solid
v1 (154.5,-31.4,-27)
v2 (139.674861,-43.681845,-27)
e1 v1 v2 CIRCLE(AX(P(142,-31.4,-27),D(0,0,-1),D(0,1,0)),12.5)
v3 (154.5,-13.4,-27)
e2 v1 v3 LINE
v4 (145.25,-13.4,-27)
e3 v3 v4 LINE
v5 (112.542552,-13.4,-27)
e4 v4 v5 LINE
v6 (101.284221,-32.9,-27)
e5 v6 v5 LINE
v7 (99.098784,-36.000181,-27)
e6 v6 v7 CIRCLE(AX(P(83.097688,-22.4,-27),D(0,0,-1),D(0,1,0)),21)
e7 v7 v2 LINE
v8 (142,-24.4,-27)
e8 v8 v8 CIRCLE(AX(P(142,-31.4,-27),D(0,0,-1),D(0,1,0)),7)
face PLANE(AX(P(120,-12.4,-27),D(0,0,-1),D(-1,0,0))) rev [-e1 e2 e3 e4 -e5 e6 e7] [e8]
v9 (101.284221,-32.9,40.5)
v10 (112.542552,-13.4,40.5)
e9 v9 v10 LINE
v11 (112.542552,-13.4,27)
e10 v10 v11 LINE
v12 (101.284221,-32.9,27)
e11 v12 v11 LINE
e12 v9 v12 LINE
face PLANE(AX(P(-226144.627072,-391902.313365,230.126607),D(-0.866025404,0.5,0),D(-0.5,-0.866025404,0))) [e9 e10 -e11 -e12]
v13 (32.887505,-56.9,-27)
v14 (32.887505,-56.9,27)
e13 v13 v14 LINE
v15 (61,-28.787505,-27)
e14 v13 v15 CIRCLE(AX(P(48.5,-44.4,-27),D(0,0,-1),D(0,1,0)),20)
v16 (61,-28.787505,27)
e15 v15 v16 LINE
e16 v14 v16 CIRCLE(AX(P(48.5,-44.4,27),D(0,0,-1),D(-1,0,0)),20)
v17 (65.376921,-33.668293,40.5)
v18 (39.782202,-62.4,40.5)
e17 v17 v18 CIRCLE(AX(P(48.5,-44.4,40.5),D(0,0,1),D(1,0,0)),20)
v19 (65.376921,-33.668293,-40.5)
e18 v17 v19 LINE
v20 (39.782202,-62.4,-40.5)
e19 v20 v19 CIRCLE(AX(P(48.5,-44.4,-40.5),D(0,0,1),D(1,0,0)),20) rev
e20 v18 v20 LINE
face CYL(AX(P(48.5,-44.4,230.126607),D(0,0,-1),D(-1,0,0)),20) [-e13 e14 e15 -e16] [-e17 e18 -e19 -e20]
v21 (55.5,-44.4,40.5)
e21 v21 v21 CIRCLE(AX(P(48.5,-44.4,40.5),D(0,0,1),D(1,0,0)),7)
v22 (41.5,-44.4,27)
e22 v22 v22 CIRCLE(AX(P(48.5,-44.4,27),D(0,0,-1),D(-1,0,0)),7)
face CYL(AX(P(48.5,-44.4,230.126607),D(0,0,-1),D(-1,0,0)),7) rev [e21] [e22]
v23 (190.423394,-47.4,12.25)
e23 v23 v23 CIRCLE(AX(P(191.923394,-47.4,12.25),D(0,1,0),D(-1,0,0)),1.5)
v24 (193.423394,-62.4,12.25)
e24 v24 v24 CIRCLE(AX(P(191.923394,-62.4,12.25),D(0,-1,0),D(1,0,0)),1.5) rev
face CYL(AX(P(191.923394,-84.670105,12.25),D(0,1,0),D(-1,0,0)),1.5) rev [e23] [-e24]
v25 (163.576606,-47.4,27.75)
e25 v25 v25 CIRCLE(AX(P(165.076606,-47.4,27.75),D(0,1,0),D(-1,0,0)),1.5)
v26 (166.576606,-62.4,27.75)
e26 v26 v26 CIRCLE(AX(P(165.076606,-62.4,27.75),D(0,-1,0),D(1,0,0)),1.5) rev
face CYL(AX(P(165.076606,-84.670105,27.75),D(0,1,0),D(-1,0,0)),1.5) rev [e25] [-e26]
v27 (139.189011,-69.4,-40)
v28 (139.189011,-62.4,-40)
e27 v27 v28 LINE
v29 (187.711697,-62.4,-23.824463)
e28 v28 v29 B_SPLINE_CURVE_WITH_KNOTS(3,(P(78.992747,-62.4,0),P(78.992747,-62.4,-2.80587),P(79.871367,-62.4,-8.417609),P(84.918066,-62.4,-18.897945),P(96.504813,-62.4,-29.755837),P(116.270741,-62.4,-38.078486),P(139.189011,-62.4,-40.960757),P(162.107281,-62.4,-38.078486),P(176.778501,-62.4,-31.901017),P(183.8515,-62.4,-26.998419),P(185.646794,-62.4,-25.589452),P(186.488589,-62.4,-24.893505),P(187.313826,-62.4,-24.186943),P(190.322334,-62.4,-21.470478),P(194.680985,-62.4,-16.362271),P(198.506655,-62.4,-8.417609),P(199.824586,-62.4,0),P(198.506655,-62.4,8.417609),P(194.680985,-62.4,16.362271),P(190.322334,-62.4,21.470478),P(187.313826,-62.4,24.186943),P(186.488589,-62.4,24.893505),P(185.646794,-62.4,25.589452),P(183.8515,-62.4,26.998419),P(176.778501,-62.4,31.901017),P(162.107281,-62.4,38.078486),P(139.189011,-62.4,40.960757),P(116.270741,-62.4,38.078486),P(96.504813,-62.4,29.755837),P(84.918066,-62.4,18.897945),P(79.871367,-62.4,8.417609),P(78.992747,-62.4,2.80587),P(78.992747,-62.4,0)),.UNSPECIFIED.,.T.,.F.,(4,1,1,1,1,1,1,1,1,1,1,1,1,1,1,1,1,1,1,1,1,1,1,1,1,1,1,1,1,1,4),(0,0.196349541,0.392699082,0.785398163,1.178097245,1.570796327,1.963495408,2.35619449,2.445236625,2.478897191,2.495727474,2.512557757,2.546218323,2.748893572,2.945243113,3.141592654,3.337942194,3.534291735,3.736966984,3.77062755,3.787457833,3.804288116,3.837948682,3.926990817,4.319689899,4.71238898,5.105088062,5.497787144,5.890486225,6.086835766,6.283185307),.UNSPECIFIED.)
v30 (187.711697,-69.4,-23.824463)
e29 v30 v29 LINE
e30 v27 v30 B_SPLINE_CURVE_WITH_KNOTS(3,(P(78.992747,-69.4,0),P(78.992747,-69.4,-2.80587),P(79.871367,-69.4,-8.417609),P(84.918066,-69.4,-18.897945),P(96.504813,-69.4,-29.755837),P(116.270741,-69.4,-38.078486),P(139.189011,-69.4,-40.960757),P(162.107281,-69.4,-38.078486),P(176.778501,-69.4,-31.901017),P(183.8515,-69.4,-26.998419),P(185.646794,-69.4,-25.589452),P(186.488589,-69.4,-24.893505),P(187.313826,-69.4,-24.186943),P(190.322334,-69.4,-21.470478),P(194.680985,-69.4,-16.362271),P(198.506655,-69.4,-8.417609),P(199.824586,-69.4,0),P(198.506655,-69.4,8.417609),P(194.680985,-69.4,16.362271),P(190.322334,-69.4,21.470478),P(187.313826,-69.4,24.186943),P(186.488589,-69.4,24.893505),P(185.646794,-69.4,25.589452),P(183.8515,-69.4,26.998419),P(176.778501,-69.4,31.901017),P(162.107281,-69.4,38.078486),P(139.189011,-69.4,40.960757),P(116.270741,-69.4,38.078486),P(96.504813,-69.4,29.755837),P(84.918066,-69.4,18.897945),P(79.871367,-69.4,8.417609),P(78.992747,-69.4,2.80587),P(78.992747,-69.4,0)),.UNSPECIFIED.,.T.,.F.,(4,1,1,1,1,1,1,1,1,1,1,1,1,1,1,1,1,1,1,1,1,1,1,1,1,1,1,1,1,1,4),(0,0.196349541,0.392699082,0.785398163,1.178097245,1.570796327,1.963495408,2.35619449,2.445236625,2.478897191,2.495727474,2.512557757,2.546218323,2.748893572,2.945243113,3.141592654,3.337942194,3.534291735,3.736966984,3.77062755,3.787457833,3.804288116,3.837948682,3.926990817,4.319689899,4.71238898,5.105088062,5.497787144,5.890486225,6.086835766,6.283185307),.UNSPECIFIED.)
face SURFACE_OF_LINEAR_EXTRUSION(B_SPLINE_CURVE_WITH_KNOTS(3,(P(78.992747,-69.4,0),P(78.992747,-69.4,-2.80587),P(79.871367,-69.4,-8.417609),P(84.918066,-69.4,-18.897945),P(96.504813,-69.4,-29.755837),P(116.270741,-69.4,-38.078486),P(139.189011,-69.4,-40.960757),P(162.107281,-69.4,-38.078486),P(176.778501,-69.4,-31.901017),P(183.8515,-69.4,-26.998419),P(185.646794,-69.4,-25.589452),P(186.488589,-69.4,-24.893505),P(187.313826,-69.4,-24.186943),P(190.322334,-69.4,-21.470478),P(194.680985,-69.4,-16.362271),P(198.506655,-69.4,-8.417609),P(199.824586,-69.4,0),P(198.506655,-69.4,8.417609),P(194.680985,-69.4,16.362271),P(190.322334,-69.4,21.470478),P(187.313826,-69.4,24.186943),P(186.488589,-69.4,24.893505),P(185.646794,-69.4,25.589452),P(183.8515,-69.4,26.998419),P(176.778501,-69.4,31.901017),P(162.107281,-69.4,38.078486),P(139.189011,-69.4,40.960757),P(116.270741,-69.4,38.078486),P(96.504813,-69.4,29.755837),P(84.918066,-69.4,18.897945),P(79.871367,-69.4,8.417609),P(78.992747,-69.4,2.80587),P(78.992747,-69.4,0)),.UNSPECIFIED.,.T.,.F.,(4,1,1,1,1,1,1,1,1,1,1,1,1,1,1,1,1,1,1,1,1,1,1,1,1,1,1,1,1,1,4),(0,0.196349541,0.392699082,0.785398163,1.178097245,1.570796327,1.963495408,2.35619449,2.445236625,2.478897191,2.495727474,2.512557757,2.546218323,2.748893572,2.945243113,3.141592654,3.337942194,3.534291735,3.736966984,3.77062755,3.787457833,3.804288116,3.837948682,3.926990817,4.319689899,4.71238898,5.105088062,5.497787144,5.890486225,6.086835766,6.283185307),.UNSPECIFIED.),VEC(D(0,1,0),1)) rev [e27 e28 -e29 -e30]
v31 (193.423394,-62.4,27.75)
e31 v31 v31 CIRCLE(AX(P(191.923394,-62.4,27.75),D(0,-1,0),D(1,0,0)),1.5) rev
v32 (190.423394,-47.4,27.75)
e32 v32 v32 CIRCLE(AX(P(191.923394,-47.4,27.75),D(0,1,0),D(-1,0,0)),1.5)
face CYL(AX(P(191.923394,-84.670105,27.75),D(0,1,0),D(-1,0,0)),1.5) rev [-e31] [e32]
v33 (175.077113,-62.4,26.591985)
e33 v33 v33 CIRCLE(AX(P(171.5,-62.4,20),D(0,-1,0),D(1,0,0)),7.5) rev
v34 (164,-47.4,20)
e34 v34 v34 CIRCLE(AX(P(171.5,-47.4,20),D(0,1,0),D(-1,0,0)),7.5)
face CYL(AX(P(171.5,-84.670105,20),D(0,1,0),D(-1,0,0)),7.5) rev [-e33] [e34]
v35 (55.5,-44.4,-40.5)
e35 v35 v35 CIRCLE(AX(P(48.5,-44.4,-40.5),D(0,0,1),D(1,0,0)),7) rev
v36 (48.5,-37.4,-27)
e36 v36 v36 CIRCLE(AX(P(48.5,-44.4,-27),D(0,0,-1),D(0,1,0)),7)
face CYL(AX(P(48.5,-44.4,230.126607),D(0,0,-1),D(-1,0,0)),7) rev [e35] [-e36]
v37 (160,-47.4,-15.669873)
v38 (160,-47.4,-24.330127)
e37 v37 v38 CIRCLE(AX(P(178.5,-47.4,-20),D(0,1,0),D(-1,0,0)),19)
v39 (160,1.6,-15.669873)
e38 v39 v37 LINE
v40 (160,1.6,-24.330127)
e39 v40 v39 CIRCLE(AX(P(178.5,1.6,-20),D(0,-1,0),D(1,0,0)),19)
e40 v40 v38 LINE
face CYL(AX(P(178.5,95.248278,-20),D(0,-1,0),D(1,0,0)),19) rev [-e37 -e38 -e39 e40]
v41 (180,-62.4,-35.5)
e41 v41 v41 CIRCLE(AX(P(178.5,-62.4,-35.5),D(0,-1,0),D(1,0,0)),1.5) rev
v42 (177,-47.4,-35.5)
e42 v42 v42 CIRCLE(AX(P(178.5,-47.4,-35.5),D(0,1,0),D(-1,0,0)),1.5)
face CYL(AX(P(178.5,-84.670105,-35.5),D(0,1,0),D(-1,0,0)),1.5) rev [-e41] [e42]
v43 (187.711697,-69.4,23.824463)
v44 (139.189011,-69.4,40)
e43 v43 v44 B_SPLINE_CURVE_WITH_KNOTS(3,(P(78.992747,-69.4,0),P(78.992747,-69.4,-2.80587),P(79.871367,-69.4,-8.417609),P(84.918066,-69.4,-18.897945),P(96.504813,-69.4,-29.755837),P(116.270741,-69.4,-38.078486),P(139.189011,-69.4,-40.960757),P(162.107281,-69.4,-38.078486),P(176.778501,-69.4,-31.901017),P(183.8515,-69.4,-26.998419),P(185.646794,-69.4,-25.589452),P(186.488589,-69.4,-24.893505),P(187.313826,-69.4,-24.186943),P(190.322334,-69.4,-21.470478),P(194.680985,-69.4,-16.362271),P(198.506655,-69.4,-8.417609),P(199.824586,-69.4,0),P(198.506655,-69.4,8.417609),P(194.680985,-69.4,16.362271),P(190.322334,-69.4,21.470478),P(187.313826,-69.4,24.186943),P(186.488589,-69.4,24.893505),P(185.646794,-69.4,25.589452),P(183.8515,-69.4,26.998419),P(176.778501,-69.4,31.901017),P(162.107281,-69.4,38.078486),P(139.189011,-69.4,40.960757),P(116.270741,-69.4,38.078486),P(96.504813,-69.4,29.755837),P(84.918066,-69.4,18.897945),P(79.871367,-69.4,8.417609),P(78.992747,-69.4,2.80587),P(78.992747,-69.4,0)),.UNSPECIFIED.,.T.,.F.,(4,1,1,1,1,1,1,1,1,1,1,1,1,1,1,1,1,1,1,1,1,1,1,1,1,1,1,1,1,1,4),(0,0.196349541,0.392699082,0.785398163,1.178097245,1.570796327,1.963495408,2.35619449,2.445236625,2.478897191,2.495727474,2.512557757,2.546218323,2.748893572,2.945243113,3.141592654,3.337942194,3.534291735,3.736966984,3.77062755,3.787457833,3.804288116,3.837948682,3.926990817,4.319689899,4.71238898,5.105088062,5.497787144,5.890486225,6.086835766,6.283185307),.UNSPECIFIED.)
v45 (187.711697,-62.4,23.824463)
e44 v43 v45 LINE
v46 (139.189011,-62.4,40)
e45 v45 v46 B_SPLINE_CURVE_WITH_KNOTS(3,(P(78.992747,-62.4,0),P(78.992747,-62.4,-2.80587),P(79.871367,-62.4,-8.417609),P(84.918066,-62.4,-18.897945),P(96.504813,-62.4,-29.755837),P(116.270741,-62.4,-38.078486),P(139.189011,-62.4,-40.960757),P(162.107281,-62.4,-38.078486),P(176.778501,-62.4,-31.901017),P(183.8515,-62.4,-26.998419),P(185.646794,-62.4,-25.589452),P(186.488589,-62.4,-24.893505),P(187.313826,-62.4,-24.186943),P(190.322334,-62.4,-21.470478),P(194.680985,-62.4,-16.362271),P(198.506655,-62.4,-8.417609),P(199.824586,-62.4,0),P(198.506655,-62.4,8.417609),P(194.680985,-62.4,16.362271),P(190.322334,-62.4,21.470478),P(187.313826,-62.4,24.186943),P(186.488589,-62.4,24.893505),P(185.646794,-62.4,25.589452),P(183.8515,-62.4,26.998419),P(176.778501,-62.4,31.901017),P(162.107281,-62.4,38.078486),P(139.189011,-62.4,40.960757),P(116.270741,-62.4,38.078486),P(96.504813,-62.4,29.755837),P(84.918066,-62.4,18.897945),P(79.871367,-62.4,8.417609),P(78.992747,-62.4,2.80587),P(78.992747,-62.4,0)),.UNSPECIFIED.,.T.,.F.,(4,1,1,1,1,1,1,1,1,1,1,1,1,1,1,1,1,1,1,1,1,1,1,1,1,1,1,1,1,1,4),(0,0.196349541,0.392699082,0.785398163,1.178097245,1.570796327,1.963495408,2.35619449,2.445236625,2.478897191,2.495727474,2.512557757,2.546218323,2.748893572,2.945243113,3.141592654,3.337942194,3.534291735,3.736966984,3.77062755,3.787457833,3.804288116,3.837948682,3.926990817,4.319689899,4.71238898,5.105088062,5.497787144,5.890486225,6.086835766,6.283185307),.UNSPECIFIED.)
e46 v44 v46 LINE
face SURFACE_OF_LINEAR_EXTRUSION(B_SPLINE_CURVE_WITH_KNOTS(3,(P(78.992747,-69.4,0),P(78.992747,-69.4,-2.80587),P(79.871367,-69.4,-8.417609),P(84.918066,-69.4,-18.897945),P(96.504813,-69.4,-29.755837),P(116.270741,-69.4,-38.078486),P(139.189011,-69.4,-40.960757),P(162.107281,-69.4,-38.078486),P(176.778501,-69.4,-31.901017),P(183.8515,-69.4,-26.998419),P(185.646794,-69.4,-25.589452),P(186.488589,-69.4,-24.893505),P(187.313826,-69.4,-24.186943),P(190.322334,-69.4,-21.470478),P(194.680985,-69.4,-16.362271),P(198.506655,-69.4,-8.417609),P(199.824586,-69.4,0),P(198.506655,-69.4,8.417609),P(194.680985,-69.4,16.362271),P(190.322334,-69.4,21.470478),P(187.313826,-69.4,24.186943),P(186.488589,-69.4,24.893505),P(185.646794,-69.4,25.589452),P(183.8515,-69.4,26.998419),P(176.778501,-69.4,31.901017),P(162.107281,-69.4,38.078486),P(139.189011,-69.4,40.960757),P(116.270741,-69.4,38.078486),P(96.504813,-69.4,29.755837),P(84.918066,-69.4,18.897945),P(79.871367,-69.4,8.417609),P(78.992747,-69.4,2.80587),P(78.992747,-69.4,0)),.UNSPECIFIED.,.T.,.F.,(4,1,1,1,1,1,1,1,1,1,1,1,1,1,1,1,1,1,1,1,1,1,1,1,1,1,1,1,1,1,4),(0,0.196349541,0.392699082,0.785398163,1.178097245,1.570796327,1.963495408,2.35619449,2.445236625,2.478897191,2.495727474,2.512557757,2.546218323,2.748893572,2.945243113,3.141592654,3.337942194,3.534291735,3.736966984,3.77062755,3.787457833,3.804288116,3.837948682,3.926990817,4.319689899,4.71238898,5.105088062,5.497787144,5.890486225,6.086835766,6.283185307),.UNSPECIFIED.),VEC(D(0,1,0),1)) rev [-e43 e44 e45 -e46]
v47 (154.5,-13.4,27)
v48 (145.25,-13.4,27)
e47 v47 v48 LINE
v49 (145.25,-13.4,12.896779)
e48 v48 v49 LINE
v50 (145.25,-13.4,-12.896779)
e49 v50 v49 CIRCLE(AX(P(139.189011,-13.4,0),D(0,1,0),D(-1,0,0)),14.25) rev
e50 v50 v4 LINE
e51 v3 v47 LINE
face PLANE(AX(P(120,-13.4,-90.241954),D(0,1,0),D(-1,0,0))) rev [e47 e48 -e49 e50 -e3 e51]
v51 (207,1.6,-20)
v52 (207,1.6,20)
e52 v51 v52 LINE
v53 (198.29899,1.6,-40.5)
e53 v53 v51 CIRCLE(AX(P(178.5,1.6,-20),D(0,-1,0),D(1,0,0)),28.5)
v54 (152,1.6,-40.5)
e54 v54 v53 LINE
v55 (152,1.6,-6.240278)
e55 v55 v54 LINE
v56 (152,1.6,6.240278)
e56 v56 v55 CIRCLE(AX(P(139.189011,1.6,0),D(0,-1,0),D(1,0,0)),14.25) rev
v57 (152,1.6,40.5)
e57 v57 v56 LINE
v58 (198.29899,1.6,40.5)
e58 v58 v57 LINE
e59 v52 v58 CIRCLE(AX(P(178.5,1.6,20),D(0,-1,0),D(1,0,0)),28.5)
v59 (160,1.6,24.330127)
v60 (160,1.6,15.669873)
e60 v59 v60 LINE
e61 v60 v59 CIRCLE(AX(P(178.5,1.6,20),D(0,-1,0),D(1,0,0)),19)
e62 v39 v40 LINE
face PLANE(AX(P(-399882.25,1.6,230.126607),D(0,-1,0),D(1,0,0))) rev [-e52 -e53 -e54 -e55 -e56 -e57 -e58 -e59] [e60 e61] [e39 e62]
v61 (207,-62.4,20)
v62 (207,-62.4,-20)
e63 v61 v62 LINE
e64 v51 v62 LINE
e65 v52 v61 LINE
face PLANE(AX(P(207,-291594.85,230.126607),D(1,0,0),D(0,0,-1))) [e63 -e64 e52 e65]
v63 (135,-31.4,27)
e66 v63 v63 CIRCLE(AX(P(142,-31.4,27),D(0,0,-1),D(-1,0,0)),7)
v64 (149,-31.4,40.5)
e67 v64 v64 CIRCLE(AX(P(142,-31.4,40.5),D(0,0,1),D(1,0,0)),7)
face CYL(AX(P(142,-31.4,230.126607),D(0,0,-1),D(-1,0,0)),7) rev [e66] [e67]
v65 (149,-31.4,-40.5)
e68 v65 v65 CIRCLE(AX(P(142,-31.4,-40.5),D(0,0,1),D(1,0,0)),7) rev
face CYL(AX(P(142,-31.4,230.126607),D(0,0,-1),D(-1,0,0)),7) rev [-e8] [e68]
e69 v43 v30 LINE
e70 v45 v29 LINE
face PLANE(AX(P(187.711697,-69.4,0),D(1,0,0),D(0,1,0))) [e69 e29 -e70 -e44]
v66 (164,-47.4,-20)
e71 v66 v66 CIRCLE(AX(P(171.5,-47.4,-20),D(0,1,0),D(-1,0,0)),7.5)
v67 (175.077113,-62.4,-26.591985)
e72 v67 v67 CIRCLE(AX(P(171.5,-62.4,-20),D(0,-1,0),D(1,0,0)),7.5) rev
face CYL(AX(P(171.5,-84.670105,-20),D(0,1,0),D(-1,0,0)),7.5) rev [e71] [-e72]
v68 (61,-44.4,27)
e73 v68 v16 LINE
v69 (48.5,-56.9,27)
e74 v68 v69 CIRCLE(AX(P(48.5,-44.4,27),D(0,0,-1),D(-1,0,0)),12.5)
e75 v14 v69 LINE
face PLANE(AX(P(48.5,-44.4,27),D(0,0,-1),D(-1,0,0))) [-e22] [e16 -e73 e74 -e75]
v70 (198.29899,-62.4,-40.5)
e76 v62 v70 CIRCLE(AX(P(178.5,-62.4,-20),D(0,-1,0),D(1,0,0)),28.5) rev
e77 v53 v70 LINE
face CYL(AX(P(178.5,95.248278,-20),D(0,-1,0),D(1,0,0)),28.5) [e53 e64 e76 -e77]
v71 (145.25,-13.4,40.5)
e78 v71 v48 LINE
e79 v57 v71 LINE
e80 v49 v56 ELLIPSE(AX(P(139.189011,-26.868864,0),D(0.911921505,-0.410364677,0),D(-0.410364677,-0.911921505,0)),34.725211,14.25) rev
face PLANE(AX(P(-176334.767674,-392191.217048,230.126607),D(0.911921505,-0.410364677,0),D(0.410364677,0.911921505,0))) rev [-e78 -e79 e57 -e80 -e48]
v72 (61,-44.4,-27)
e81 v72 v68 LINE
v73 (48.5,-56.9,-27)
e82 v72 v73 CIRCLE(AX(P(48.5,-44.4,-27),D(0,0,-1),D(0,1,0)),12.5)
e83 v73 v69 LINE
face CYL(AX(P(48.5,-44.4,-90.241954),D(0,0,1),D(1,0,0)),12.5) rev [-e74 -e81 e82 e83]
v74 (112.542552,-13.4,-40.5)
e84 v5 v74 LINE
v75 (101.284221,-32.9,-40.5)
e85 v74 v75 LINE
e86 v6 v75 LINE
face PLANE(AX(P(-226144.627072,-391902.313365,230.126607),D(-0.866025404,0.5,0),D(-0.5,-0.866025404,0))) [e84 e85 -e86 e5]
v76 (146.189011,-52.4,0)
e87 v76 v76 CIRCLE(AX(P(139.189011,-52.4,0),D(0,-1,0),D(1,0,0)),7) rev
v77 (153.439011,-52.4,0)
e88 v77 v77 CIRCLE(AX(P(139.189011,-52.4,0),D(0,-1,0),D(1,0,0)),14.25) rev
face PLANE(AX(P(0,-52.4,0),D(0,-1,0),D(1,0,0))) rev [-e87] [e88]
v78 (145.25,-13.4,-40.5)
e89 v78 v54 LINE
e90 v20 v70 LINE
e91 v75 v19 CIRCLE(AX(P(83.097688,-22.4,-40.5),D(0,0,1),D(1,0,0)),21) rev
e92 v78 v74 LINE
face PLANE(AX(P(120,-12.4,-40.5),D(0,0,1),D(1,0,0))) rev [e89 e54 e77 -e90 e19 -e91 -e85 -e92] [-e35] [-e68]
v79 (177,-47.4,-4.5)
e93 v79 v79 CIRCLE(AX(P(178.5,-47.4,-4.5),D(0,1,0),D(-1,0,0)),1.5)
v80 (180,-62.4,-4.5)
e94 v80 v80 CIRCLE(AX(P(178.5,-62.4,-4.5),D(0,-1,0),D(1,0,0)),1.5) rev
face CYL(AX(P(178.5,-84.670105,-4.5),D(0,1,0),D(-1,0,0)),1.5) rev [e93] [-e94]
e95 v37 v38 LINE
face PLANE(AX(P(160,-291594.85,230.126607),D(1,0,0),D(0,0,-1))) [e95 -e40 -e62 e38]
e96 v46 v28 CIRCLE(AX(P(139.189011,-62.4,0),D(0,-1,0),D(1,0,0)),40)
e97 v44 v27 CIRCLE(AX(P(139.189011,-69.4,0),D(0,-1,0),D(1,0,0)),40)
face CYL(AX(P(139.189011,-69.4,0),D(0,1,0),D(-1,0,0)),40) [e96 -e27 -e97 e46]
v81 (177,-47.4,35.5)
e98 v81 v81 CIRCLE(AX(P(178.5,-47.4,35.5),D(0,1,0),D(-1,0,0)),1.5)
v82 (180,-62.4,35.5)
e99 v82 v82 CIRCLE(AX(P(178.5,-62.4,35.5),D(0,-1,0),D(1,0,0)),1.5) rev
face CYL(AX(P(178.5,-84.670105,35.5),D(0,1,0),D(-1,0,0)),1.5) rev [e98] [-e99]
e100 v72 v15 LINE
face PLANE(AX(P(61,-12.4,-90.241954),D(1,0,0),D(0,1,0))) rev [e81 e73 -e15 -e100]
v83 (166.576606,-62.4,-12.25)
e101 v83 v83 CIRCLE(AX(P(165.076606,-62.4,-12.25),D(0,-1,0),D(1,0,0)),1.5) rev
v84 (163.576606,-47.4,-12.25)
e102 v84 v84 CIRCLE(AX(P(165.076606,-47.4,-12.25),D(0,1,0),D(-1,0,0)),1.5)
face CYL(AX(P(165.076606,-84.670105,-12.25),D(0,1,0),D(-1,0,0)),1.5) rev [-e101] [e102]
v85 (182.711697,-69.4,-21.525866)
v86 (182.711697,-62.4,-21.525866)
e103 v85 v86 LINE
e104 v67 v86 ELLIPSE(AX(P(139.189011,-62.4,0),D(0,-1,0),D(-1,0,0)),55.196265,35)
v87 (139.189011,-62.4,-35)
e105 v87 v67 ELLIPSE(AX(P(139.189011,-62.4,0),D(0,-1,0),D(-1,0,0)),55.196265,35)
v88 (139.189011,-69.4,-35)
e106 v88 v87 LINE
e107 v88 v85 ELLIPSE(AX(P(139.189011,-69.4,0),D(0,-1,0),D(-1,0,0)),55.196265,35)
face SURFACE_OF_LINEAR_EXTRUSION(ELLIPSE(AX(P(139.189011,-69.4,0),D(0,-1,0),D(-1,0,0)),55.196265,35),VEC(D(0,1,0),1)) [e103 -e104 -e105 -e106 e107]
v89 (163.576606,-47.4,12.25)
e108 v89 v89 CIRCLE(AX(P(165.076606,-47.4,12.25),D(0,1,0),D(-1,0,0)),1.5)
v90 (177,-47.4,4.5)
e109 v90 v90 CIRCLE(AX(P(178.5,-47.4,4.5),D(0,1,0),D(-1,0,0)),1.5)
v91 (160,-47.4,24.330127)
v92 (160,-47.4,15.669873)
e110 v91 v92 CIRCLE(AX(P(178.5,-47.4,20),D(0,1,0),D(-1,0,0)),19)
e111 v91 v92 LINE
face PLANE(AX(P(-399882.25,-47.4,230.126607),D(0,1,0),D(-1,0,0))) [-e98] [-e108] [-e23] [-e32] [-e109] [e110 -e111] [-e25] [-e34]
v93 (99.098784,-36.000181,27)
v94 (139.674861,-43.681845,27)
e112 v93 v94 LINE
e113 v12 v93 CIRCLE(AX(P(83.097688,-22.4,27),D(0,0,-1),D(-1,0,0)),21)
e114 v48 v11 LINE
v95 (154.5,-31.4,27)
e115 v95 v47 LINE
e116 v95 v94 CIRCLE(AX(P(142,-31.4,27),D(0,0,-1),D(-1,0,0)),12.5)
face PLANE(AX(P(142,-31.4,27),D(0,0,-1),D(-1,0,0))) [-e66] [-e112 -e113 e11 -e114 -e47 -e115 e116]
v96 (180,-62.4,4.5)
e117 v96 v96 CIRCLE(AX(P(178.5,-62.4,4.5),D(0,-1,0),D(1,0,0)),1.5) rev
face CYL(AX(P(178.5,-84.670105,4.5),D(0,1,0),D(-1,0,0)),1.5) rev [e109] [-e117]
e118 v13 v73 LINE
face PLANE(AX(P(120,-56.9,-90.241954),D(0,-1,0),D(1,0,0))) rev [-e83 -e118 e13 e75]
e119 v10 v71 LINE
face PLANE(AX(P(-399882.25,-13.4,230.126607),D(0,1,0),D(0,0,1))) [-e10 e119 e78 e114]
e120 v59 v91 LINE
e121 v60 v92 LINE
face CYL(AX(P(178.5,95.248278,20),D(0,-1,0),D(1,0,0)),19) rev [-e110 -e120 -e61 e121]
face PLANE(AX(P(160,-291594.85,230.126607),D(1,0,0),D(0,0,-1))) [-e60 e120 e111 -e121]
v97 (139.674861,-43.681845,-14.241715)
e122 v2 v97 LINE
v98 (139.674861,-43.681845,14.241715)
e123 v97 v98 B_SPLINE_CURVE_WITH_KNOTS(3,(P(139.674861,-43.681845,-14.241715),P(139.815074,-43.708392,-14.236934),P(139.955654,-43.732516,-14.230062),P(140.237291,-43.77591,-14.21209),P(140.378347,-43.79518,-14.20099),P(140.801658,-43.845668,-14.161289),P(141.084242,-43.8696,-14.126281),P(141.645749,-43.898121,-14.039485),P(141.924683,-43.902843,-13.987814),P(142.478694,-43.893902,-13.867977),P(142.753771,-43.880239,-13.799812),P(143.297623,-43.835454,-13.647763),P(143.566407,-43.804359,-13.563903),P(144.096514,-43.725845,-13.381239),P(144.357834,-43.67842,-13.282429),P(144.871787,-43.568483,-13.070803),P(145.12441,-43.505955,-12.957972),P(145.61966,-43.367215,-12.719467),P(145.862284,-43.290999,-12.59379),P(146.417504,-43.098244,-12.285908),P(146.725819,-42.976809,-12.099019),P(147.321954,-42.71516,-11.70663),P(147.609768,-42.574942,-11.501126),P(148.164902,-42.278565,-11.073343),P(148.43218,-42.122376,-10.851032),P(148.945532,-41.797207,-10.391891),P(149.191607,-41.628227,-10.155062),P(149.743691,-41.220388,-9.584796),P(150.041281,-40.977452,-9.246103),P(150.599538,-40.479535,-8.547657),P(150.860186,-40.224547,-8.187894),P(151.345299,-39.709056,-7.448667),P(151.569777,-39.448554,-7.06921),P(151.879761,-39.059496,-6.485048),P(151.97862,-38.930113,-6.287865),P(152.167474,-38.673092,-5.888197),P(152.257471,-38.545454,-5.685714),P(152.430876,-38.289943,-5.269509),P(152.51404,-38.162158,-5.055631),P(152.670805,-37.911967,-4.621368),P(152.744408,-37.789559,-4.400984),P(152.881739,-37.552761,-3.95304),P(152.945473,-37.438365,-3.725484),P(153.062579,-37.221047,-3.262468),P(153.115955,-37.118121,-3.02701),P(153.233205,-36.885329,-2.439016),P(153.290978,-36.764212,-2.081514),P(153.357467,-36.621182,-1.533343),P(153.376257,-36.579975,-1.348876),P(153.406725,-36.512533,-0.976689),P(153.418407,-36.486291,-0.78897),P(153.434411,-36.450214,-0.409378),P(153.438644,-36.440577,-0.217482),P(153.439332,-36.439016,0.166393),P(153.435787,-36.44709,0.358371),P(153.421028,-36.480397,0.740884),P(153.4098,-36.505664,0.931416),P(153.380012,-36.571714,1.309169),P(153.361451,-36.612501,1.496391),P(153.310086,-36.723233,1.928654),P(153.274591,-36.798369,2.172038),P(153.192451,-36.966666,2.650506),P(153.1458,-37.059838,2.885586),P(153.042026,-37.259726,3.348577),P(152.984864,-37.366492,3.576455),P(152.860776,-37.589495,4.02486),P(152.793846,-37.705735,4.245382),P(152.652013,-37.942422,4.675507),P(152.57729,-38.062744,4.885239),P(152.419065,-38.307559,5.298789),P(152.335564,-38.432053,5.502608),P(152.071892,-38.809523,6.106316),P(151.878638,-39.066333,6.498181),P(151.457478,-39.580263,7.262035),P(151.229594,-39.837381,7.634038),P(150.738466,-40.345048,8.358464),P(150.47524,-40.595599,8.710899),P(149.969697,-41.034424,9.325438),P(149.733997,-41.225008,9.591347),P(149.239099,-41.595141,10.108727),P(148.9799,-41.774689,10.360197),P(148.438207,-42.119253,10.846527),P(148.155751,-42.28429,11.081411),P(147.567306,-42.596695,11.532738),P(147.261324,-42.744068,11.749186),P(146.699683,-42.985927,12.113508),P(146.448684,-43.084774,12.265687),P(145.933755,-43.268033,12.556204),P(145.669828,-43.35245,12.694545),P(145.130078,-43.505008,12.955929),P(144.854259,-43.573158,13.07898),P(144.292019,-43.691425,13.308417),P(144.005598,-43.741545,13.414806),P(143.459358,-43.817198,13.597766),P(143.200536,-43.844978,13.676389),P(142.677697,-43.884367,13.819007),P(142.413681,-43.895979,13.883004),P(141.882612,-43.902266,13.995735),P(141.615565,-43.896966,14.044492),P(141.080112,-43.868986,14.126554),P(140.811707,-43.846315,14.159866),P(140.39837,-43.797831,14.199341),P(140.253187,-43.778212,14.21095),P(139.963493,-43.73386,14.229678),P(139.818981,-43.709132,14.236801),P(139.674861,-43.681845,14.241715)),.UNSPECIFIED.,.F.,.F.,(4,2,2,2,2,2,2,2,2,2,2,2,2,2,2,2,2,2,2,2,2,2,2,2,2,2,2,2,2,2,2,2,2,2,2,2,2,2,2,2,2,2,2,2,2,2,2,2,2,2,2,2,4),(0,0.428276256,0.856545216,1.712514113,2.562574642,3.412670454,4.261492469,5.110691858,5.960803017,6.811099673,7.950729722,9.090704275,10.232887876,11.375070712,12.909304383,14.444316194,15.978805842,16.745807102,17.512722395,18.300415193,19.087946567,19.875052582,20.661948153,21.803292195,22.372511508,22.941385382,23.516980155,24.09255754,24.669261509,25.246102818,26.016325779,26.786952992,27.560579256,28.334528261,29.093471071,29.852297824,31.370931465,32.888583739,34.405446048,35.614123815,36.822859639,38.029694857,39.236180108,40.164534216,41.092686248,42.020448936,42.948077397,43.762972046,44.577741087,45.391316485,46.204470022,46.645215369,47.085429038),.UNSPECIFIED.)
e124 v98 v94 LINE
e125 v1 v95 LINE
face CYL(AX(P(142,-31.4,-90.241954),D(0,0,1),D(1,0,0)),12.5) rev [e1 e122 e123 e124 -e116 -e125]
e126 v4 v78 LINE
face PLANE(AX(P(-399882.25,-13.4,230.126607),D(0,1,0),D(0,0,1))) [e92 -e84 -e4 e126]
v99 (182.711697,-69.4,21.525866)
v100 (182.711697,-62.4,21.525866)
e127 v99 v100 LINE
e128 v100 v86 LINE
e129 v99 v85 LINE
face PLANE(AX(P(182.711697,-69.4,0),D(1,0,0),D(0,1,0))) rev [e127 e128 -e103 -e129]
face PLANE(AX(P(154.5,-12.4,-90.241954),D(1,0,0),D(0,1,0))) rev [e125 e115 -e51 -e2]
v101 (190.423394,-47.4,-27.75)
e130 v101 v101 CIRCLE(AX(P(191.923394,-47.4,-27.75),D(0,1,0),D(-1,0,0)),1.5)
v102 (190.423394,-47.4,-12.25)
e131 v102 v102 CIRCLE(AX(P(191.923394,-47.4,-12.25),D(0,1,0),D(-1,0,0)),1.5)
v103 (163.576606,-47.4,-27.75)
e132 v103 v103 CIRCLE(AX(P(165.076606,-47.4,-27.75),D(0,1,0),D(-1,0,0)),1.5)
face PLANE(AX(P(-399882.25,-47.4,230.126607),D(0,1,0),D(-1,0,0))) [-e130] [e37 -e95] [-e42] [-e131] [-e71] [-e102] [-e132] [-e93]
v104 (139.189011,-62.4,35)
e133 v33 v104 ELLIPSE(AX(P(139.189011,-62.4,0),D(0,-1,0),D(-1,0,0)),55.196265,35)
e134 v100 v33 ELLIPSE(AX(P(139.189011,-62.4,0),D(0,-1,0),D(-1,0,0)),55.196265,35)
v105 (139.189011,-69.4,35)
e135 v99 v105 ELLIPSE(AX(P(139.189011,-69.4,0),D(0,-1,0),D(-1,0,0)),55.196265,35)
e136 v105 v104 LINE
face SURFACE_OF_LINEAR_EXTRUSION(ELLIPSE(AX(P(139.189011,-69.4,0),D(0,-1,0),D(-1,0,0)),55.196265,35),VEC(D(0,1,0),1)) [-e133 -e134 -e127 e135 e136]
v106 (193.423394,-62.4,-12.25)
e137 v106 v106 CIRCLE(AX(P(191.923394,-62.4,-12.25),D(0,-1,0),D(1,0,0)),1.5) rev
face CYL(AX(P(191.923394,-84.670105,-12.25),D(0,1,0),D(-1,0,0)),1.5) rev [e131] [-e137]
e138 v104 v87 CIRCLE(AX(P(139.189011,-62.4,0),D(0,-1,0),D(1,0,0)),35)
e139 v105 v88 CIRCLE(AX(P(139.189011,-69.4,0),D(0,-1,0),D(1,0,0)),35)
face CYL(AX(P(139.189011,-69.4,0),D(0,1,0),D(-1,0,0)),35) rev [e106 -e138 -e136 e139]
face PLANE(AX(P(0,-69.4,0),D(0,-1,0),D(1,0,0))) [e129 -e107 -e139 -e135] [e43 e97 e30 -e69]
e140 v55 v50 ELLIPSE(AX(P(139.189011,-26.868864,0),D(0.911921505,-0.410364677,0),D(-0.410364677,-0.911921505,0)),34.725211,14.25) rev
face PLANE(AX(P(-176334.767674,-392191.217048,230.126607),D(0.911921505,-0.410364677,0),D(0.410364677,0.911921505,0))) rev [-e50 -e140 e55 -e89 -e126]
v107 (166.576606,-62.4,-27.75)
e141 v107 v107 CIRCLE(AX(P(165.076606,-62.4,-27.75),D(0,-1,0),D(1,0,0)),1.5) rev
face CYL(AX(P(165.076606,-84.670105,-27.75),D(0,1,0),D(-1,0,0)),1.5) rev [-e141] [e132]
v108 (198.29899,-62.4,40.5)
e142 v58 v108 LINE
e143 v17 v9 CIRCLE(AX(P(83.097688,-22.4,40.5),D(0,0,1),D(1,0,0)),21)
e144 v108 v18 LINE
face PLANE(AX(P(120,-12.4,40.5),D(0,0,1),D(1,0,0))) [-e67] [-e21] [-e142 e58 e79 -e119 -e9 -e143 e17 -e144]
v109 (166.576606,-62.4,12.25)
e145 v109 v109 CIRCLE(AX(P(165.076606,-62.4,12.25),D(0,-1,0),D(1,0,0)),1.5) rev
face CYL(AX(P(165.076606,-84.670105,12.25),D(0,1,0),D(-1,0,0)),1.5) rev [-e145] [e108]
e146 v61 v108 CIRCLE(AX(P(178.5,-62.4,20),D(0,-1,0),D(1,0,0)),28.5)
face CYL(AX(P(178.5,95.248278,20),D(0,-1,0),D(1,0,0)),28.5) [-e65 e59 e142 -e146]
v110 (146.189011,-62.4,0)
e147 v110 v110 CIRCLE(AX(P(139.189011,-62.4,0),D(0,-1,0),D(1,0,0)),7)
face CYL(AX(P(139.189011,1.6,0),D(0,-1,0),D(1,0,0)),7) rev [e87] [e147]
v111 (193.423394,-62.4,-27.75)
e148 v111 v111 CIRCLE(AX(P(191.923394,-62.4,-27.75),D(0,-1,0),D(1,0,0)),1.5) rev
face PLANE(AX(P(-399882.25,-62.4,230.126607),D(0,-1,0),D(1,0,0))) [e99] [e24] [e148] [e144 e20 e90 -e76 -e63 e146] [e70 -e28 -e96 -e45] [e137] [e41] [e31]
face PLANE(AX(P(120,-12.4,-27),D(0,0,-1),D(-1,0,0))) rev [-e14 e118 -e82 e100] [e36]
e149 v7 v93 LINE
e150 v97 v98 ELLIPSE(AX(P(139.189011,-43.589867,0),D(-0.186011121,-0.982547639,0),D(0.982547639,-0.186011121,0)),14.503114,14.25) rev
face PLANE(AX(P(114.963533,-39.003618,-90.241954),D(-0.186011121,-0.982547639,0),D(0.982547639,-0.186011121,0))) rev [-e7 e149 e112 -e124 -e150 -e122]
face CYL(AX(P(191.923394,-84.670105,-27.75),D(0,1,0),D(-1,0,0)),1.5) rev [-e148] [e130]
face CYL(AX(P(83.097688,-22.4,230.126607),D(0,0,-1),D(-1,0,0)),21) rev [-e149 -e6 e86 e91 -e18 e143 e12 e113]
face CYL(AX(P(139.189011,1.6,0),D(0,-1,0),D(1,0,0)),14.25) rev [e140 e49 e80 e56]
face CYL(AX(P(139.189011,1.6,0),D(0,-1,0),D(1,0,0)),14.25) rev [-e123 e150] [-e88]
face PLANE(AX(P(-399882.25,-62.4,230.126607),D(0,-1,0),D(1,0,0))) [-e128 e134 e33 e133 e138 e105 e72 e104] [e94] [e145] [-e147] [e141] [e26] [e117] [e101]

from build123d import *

# Parameters (mm, degrees)
BOSS_EXTRUDE1_DEPTH      = 40.5
BOSS_EXTRUDE1_DEPTH_BACK = 40.5
SKETCH1_R                = 7
CUT_EXTRUDE1_START       = -67.5
SKETCH2_R                = 12.499999991
SKETCH2_R_2              = 7
SKETCH2_R_3              = 12.5
CUT_EXTRUDE1_DEPTH       = 54
BOSS_EXTRUDE2_DEPTH      = 49.000000379
CUT_EXTRUDE2_START       = -14.999999621
SKETCH4_R                = 7.499999993
SKETCH4_R_2              = 1.499999993
CUT_EXTRUDE2_DEPTH       = 14.999999621
SKETCH5_R                = 6.999999993
CUT_EXTRUDE3_DEPTH       = 221.420620892
BOSS_EXTRUDE3_DEPTH      = 7
CUT_EXTRUDE6_START       = 10
SKETCH7_R                = 14.249999993
SKETCH7_R_2              = 6.999999993
CUT_EXTRUDE6_DEPTH       = 211.420621005


# Read off the part's stored shape, not the designer's step: Boss-Extrude3
with BuildPart() as part:
    # Sketch1 → Boss-Extrude1 (new, two sides: drawn at the far end of the back side and taken through both)
    with BuildSketch(Plane.XY.offset(-BOSS_EXTRUDE1_DEPTH_BACK)):
        with BuildLine():
            ThreePointArc((101.284221271, -32.899999986), (83.546912911, -43.395194612), (65.376921076, -33.668293007))
            ThreePointArc((65.376921076, -33.668293007), (33.566126775, -31.096638376), (39.782202113, -62.4))
            Line((39.782202113, -62.4), (207.000000276, -62.4))
            Line((207.000000276, -62.4), (207.000000276, -47.400000379))
            Line((207.000000276, -47.400000379), (160, -47.400000379))
            Line((160, -47.400000379), (160, 1.6))
            Line((160, 1.6), (152, 1.6))
            Line((152, 1.6), (145.25, -13.4))
            Line((145.25, -13.4), (112.542551513, -13.4))
            Line((112.542551513, -13.4), (101.284221271, -32.899999986))
        make_face()
        with Locations((142, -31.4)):
            Circle(SKETCH1_R, mode=Mode.SUBTRACT)
        with Locations((48.5, -44.4)):
            Circle(SKETCH1_R, mode=Mode.SUBTRACT)
    extrude(amount=BOSS_EXTRUDE1_DEPTH + BOSS_EXTRUDE1_DEPTH_BACK)

    # Sketch2 → Cut-Extrude1 (cut)
    # profile 1 of 4: a face of its own
    with BuildSketch(Plane.XY.offset(40.5).offset(CUT_EXTRUDE1_START)):
        with Locations((142, -31.4)):
            Circle(SKETCH2_R)
        with Locations(Location((142, -31.4, 0), (0, 0, 180))):
            Circle(SKETCH2_R_2, mode=Mode.SUBTRACT)
    # profile 2 of 4: a face of its own
    with BuildSketch(Plane.XY.offset(40.5).offset(CUT_EXTRUDE1_START)):
        with BuildLine():
            Line((61, -44.4), (61, -28.787505004))
            ThreePointArc((61, -28.787505004), (39.839745962, -26.372243623), (28.5, -44.4))
            ThreePointArc((28.5, -44.4), (29.628726859, -51.023824427), (32.887505004, -56.9))
            Line((32.887505004, -56.9), (48.5, -56.9))
            ThreePointArc((48.5, -56.9), (39.661165235, -35.561165235), (61, -44.4))
        make_face()
    # profile 3 of 4: a face of its own
    with BuildSketch(Plane.XY.offset(40.5).offset(CUT_EXTRUDE1_START)):
        with Locations((48.5, -44.4)):
            Circle(SKETCH2_R_3)
        with Locations(Location((48.5, -44.4, 0), (0, 0, 180))):
            Circle(SKETCH2_R_2, mode=Mode.SUBTRACT)
    # profile 4 of 4: a face of its own
    with BuildSketch(Plane.XY.offset(40.5).offset(CUT_EXTRUDE1_START)):
        with BuildLine():
            ThreePointArc((101.284221271, -32.899999986), (100.261640945, -34.499533541), (99.0987841, -36.000180759))
            Line((99.0987841, -36.000180759), (139.674860989, -43.681845488))
            ThreePointArc((139.674860991, -43.681845479), (134.025485527, -21.774143224), (154.499999991, -31.4))
            Line((154.5, -31.4), (154.5, -13.4))
            Line((154.5, -13.4), (145.25, -13.4))
            Line((145.25, -13.4), (112.542551513, -13.4))
            Line((112.542551513, -13.4), (101.284221271, -32.899999986))
        make_face()
    extrude(amount=CUT_EXTRUDE1_DEPTH, mode=Mode.SUBTRACT)

    # Sketch3 → Boss-Extrude2 (add)
    with BuildSketch(Plane(origin=(0, -47.400000379, 0), x_dir=(1, 0, 0), z_dir=(0, 1, 0))):
        with BuildLine():
            Line((198.298990268, 40.5), (160, 40.5))
            Line((160, 40.5), (160, 24.330126958))
            ThreePointArc((160, 24.330126958), (197.5, 20), (160, 15.669873042))
            Line((160, 15.669873042), (160, -15.669873042))
            ThreePointArc((160, -15.669873042), (197.5, -20), (160, -24.330126958))
            Line((160, -24.330126958), (160, -40.5))
            Line((160, -40.5), (198.298990268, -40.5))
            ThreePointArc((198.298990268, -40.5), (204.734721686, -31.135052483), (207.000000277, -20))
            Line((207.000000276, -20), (207.000000276, 20))
            ThreePointArc((207.000000277, 20), (204.734721686, 31.135052483), (198.298990268, 40.5))
        make_face()
    extrude(amount=BOSS_EXTRUDE2_DEPTH)

    # Sketch4 → Cut-Extrude2 (cut)
    with BuildSketch(Plane(origin=(0, -47.400000379, 0), x_dir=(1, 0, 0), z_dir=(0, 1, 0)).offset(CUT_EXTRUDE2_START)):
        with BuildLine():
            Line((207.000000276, 20), (207.000000276, 40.5))
            Line((207.000000276, 40.5), (198.298990268, 40.5))
            ThreePointArc((198.298990268, 40.5), (204.734721686, 31.135052483), (207.000000277, 20))
        make_face()
        with BuildLine():
            Line((207.000000276, -40.5), (207.000000276, -20))
            ThreePointArc((207.000000277, -20), (204.734721686, -31.135052483), (198.298990268, -40.5))
            Line((198.298990268, -40.5), (207.000000276, -40.5))
        make_face()
        with Locations(Location((171.500000007, -20, 0), (0, 0, 180))):
            Circle(SKETCH4_R)
        with Locations(Location((171.500000007, 20, 0), (0, 0, 180))):
            Circle(SKETCH4_R)
        with Locations(Location((178.500000007, 4.5, 0), (0, 0, 180))):
            Circle(SKETCH4_R_2)
        with Locations(Location((165.076606249, 12.25, 0), (0, 0, 180))):
            Circle(SKETCH4_R_2)
        with Locations(Location((191.923393766, 12.25, 0), (0, 0, 180))):
            Circle(SKETCH4_R_2)
        with Locations(Location((191.923393766, 27.75, 0), (0, 0, 180))):
            Circle(SKETCH4_R_2)
        with Locations(Location((178.500000007, 35.5, 0), (0, 0, 180))):
            Circle(SKETCH4_R_2)
        with Locations(Location((165.076606249, 27.75, 0), (0, 0, 180))):
            Circle(SKETCH4_R_2)
        with Locations(Location((165.076606249, -12.25, 0), (0, 0, 180))):
            Circle(SKETCH4_R_2)
        with Locations(Location((178.500000007, -4.5, 0), (0, 0, 180))):
            Circle(SKETCH4_R_2)
        with Locations(Location((191.923393766, -12.25, 0), (0, 0, 180))):
            Circle(SKETCH4_R_2)
        with Locations(Location((191.923393766, -27.75, 0), (0, 0, 180))):
            Circle(SKETCH4_R_2)
        with Locations(Location((178.500000007, -35.5, 0), (0, 0, 180))):
            Circle(SKETCH4_R_2)
        with Locations(Location((165.076606249, -27.75, 0), (0, 0, 180))):
            Circle(SKETCH4_R_2)
    extrude(amount=CUT_EXTRUDE2_DEPTH, mode=Mode.SUBTRACT)

    # Sketch5 → Cut-Extrude3 (cut, through all)
    with BuildSketch(Plane.XZ.offset(62.4)):
        with Locations((139.189011165, 0)):
            Circle(SKETCH5_R)
    extrude(amount=-CUT_EXTRUDE3_DEPTH, mode=Mode.SUBTRACT)

    # Boss-Extrude3 outline → Boss-Extrude3 (add)
    with BuildSketch(Plane.XZ.offset(62.4)):
        with BuildLine():
            ThreePointArc((139.189011157, 40), (99.189011157, 0), (139.189011157, -40))
            add(Edge.make_bspline(
                [(139.189011157, -40), (146.82843448, -40), (162.107281125, -38.078486158), (176.778501223, -31.90101694), (183.851500427, -26.99841863), (185.64679387, -25.589452029), (186.4885893, -24.893504667), (187.107516855, -24.363583077), (187.51172734, -24.005038173), (187.711696887, -23.824463012)],
                knots=[1.570796327, 1.570796327, 1.570796327, 1.570796327, 1.963495408, 2.35619449, 2.445236625, 2.478897191, 2.495727474, 2.512557757, 2.52938804, 2.52938804, 2.52938804, 2.52938804], degree=3))
            Line((187.711696887, -23.824463012), (187.711696887, 23.824463012))
            add(Edge.make_bspline(
                [(187.711696887, 23.824463012), (187.51172734, 24.005038173), (187.107516855, 24.363583077), (186.4885893, 24.893504667), (185.64679387, 25.589452029), (183.851500427, 26.99841863), (176.778501223, 31.90101694), (162.107281125, 38.078486158), (146.82843448, 40), (139.189011157, 40)],
                knots=[3.753797267, 3.753797267, 3.753797267, 3.753797267, 3.77062755, 3.787457833, 3.804288116, 3.837948682, 3.926990817, 4.319689899, 4.71238898, 4.71238898, 4.71238898, 4.71238898], degree=3))
        make_face()
        with BuildLine():
            add(Edge.make_bspline(
                [(139.189011157, -35), (166.137629731, -35), (182.711696887, -21.525865932)],
                knots=[1.570796327, 1.570796327, 1.570796327, 2.479175311, 2.479175311, 2.479175311], degree=2, weights=[1, 0.898616921, 1]))
            ThreePointArc((139.189011157, -35), (104.189011157, 0), (139.189011157, 35))
            add(Edge.make_bspline(
                [(182.711696887, 21.525865932), (166.137629731, 35), (139.189011157, 35)],
                knots=[3.804009997, 3.804009997, 3.804009997, 4.71238898, 4.71238898, 4.71238898], degree=2, weights=[1, 0.898616921, 1]))
            Line((182.711696887, 21.525865932), (182.711696887, -21.525865932))
        make_face(mode=Mode.SUBTRACT)
    extrude(amount=BOSS_EXTRUDE3_DEPTH)

    # Sketch7 → Cut-Extrude6 (cut, through all)
    # profile 1 of 2: a face of its own
    with BuildSketch(Plane(origin=(0, -62.4, 0), x_dir=(1, 0, 0), z_dir=(0, 1, 0)).offset(CUT_EXTRUDE6_START)):
        with Locations((139.189011165, 0)):
            Circle(SKETCH7_R)
        with Locations((139.189011165, 0)):
            Circle(SKETCH7_R_2, mode=Mode.SUBTRACT)
    # profile 2 of 2: a face of its own
    with BuildSketch(Plane(origin=(0, -62.4, 0), x_dir=(1, 0, 0), z_dir=(0, 1, 0)).offset(CUT_EXTRUDE6_START)):
        with Locations((139.189011165, 0)):
            Circle(SKETCH7_R_2)
    extrude(amount=CUT_EXTRUDE6_DEPTH, mode=Mode.SUBTRACT)


solid = part.part
